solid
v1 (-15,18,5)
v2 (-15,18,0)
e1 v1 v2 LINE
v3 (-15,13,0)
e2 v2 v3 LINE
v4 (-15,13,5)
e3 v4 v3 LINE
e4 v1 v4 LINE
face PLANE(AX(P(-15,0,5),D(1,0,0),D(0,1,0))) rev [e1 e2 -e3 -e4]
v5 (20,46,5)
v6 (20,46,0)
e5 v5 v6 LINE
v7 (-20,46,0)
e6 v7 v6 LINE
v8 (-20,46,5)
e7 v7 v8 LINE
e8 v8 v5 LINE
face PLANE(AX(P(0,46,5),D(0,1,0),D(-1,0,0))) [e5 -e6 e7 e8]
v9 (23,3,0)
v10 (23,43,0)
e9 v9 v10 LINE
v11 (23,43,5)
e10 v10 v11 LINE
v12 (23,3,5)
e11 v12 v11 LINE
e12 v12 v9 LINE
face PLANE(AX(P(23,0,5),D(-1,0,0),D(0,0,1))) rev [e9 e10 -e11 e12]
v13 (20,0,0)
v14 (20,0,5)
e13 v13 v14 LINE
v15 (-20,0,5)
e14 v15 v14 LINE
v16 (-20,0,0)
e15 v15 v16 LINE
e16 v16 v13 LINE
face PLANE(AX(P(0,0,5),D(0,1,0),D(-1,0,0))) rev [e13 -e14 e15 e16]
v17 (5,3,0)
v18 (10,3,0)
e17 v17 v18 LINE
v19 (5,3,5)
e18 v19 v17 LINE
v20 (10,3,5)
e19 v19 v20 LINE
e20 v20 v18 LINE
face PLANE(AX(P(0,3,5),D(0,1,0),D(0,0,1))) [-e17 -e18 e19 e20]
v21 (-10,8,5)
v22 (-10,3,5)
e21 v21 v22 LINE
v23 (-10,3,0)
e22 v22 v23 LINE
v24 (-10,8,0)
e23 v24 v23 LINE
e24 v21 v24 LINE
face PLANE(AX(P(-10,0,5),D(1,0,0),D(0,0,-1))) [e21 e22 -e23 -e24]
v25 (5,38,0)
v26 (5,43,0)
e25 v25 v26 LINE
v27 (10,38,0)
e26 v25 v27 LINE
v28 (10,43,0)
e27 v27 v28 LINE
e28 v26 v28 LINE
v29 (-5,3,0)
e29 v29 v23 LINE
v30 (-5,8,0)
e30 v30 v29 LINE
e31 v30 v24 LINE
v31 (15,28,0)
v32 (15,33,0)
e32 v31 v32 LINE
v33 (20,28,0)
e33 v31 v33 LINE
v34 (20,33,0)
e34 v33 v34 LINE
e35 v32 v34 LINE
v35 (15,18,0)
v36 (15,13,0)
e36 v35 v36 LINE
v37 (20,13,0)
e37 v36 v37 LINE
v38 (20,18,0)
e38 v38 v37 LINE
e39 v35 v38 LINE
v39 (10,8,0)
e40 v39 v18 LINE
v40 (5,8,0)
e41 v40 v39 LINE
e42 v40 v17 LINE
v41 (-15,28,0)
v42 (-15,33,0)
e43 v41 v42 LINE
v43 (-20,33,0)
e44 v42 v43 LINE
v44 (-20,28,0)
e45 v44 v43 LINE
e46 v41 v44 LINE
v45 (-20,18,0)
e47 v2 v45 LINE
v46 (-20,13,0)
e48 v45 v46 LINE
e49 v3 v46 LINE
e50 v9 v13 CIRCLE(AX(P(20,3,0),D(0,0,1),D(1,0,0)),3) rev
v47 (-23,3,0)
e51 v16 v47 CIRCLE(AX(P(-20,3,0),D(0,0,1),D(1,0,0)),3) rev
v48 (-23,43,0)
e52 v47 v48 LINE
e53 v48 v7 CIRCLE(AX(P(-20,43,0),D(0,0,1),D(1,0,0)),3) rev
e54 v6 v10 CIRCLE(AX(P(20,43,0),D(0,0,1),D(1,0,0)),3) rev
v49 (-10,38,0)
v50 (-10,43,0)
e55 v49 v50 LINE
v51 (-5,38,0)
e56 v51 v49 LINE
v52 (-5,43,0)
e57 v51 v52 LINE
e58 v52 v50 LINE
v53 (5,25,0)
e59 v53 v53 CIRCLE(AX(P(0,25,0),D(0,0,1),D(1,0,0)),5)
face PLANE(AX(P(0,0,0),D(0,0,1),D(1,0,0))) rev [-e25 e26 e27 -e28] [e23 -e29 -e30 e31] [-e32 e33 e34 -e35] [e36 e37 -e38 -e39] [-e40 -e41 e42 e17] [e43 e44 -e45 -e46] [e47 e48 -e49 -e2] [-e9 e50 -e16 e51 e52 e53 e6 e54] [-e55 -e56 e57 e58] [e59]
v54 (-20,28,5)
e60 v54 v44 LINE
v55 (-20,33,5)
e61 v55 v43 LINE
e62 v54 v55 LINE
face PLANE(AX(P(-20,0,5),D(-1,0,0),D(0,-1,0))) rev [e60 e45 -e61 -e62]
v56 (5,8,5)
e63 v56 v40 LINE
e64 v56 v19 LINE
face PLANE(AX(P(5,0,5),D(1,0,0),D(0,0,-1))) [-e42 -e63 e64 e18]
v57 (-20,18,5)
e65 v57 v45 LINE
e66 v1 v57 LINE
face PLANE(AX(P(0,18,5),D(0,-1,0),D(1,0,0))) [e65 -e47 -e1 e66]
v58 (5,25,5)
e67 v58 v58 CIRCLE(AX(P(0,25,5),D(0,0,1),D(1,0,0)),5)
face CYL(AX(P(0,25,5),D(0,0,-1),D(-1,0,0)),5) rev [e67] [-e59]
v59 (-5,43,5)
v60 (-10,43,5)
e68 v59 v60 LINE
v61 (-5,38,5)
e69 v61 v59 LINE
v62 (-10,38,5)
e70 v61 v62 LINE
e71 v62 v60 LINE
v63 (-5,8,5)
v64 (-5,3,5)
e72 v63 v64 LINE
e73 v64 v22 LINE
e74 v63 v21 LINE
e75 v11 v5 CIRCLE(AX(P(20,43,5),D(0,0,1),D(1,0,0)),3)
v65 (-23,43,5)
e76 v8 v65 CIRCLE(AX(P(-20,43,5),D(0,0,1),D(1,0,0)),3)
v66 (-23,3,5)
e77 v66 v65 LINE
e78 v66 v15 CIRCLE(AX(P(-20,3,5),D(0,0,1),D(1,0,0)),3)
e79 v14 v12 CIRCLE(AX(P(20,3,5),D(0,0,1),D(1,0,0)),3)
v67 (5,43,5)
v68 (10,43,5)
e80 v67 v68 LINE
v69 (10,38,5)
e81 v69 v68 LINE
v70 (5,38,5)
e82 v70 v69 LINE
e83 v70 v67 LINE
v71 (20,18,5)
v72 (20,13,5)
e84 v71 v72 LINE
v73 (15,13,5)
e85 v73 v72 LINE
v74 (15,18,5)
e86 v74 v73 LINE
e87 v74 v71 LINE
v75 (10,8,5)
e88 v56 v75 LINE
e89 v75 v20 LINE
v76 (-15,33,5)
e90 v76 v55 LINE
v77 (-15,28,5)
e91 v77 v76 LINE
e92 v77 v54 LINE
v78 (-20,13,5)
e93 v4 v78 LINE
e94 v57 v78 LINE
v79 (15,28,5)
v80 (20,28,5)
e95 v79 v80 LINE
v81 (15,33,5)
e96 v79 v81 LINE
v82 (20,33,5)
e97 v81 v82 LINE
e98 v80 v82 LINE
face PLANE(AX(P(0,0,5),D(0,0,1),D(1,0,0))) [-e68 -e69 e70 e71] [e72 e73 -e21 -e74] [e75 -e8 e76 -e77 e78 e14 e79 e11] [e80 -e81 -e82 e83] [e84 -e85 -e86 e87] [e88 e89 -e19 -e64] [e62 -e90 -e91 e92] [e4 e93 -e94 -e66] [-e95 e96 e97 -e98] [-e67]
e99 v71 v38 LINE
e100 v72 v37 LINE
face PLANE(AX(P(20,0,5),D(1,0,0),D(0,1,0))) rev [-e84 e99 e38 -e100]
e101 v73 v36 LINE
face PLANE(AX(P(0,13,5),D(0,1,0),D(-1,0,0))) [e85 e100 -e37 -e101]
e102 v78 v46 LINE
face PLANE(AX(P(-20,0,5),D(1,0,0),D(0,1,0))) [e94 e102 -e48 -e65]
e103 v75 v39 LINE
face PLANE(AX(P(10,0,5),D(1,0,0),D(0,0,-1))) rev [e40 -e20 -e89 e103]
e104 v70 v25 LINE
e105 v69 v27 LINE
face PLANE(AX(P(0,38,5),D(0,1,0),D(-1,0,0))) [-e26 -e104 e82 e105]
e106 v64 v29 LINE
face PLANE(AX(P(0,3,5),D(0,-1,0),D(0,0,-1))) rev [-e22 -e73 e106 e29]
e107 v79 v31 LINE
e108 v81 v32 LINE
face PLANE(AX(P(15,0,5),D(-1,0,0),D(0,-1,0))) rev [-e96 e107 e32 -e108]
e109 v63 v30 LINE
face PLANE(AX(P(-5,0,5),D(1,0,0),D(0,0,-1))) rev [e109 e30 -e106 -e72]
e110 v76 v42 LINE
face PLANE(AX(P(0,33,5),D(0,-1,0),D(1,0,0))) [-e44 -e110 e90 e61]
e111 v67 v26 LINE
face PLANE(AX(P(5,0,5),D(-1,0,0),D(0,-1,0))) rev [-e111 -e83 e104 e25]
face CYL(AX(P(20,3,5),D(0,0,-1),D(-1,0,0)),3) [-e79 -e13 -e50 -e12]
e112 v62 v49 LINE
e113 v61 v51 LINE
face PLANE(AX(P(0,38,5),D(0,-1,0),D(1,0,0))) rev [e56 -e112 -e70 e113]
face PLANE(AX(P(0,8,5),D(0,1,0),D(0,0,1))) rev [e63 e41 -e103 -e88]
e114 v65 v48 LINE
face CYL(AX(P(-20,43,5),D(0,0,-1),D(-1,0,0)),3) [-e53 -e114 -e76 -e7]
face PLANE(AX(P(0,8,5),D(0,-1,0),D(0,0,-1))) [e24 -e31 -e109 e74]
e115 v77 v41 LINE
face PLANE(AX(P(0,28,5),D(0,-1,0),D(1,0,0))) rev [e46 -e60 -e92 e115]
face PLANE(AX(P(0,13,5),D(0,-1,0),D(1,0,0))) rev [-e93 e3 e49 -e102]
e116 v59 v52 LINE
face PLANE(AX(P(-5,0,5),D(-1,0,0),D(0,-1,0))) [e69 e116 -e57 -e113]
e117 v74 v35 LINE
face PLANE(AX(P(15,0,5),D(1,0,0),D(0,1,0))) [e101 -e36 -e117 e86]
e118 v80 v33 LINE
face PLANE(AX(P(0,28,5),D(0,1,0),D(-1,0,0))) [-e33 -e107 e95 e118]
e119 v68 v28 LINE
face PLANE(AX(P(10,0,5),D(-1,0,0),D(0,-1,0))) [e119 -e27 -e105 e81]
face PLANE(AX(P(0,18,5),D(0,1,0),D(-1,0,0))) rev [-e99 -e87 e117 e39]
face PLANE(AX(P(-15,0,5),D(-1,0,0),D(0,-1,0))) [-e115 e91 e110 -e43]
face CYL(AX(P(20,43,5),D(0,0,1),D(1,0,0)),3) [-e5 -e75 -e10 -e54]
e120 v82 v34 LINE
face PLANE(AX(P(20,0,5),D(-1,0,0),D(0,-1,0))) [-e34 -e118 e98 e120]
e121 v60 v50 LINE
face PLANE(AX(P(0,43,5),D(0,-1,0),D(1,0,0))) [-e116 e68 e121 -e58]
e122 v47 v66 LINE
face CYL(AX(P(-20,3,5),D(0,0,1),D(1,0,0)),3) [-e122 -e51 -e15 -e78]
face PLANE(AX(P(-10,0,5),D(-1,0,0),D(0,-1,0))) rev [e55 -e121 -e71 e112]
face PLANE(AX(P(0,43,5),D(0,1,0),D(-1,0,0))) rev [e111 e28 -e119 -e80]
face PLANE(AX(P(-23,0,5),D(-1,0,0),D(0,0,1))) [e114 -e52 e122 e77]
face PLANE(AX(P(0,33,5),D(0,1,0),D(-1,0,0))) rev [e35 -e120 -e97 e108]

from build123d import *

# Parameters (mm, degrees)
BOSS_EXTRU_1_OUTLINE_W   = 46
BOSS_EXTRU_1_OUTLINE_H   = 46
BOSS_EXTRU_1_OUTLINE_W_2 = 5
BOSS_EXTRU_1_OUTLINE_H_2 = 5
BOSS_EXTRU_1_OUTLINE_R   = 5
BOSS_EXTRU_1_DEPTH       = 5
CONG_1_R                 = 3


# Read off the part's stored shape, not the designer's step: Boss.-Extru.1
with BuildPart() as part:
    # Boss.-Extru.1 outline → Boss.-Extru.1 (new body)
    with BuildSketch(Plane.XY):
        with Locations((0, 23)):
            Rectangle(BOSS_EXTRU_1_OUTLINE_W, BOSS_EXTRU_1_OUTLINE_H)
        with Locations((-7.5, 5.5)):
            Rectangle(BOSS_EXTRU_1_OUTLINE_W_2, BOSS_EXTRU_1_OUTLINE_H_2, mode=Mode.SUBTRACT)
        with Locations((-17.5, 15.5)):
            Rectangle(BOSS_EXTRU_1_OUTLINE_W_2, BOSS_EXTRU_1_OUTLINE_H_2, mode=Mode.SUBTRACT)
        with Locations((7.5, 5.5)):
            Rectangle(BOSS_EXTRU_1_OUTLINE_W_2, BOSS_EXTRU_1_OUTLINE_H_2, mode=Mode.SUBTRACT)
        with Locations((17.5, 15.5)):
            Rectangle(BOSS_EXTRU_1_OUTLINE_W_2, BOSS_EXTRU_1_OUTLINE_H_2, mode=Mode.SUBTRACT)
        with Locations((-17.5, 30.5)):
            Rectangle(BOSS_EXTRU_1_OUTLINE_W_2, BOSS_EXTRU_1_OUTLINE_H_2, mode=Mode.SUBTRACT)
        with Locations((-7.5, 40.5)):
            Rectangle(BOSS_EXTRU_1_OUTLINE_W_2, BOSS_EXTRU_1_OUTLINE_H_2, mode=Mode.SUBTRACT)
        with Locations((0, 25)):
            Circle(BOSS_EXTRU_1_OUTLINE_R, mode=Mode.SUBTRACT)
        with Locations((17.5, 30.5)):
            Rectangle(BOSS_EXTRU_1_OUTLINE_W_2, BOSS_EXTRU_1_OUTLINE_H_2, mode=Mode.SUBTRACT)
        with Locations((7.5, 40.5)):
            Rectangle(BOSS_EXTRU_1_OUTLINE_W_2, BOSS_EXTRU_1_OUTLINE_H_2, mode=Mode.SUBTRACT)
    extrude(amount=BOSS_EXTRU_1_DEPTH)

    # Congé1
    cong_1_edges = [part.edges().sort_by_distance(p)[0] for p in [
        (-23, 0, 2.5),
        (-23, 46, 2.5),
        (23, 46, 2.5),
        (23, 0, 2.5),
    ]]
    fillet(cong_1_edges, radius=CONG_1_R)


solid = part.part
